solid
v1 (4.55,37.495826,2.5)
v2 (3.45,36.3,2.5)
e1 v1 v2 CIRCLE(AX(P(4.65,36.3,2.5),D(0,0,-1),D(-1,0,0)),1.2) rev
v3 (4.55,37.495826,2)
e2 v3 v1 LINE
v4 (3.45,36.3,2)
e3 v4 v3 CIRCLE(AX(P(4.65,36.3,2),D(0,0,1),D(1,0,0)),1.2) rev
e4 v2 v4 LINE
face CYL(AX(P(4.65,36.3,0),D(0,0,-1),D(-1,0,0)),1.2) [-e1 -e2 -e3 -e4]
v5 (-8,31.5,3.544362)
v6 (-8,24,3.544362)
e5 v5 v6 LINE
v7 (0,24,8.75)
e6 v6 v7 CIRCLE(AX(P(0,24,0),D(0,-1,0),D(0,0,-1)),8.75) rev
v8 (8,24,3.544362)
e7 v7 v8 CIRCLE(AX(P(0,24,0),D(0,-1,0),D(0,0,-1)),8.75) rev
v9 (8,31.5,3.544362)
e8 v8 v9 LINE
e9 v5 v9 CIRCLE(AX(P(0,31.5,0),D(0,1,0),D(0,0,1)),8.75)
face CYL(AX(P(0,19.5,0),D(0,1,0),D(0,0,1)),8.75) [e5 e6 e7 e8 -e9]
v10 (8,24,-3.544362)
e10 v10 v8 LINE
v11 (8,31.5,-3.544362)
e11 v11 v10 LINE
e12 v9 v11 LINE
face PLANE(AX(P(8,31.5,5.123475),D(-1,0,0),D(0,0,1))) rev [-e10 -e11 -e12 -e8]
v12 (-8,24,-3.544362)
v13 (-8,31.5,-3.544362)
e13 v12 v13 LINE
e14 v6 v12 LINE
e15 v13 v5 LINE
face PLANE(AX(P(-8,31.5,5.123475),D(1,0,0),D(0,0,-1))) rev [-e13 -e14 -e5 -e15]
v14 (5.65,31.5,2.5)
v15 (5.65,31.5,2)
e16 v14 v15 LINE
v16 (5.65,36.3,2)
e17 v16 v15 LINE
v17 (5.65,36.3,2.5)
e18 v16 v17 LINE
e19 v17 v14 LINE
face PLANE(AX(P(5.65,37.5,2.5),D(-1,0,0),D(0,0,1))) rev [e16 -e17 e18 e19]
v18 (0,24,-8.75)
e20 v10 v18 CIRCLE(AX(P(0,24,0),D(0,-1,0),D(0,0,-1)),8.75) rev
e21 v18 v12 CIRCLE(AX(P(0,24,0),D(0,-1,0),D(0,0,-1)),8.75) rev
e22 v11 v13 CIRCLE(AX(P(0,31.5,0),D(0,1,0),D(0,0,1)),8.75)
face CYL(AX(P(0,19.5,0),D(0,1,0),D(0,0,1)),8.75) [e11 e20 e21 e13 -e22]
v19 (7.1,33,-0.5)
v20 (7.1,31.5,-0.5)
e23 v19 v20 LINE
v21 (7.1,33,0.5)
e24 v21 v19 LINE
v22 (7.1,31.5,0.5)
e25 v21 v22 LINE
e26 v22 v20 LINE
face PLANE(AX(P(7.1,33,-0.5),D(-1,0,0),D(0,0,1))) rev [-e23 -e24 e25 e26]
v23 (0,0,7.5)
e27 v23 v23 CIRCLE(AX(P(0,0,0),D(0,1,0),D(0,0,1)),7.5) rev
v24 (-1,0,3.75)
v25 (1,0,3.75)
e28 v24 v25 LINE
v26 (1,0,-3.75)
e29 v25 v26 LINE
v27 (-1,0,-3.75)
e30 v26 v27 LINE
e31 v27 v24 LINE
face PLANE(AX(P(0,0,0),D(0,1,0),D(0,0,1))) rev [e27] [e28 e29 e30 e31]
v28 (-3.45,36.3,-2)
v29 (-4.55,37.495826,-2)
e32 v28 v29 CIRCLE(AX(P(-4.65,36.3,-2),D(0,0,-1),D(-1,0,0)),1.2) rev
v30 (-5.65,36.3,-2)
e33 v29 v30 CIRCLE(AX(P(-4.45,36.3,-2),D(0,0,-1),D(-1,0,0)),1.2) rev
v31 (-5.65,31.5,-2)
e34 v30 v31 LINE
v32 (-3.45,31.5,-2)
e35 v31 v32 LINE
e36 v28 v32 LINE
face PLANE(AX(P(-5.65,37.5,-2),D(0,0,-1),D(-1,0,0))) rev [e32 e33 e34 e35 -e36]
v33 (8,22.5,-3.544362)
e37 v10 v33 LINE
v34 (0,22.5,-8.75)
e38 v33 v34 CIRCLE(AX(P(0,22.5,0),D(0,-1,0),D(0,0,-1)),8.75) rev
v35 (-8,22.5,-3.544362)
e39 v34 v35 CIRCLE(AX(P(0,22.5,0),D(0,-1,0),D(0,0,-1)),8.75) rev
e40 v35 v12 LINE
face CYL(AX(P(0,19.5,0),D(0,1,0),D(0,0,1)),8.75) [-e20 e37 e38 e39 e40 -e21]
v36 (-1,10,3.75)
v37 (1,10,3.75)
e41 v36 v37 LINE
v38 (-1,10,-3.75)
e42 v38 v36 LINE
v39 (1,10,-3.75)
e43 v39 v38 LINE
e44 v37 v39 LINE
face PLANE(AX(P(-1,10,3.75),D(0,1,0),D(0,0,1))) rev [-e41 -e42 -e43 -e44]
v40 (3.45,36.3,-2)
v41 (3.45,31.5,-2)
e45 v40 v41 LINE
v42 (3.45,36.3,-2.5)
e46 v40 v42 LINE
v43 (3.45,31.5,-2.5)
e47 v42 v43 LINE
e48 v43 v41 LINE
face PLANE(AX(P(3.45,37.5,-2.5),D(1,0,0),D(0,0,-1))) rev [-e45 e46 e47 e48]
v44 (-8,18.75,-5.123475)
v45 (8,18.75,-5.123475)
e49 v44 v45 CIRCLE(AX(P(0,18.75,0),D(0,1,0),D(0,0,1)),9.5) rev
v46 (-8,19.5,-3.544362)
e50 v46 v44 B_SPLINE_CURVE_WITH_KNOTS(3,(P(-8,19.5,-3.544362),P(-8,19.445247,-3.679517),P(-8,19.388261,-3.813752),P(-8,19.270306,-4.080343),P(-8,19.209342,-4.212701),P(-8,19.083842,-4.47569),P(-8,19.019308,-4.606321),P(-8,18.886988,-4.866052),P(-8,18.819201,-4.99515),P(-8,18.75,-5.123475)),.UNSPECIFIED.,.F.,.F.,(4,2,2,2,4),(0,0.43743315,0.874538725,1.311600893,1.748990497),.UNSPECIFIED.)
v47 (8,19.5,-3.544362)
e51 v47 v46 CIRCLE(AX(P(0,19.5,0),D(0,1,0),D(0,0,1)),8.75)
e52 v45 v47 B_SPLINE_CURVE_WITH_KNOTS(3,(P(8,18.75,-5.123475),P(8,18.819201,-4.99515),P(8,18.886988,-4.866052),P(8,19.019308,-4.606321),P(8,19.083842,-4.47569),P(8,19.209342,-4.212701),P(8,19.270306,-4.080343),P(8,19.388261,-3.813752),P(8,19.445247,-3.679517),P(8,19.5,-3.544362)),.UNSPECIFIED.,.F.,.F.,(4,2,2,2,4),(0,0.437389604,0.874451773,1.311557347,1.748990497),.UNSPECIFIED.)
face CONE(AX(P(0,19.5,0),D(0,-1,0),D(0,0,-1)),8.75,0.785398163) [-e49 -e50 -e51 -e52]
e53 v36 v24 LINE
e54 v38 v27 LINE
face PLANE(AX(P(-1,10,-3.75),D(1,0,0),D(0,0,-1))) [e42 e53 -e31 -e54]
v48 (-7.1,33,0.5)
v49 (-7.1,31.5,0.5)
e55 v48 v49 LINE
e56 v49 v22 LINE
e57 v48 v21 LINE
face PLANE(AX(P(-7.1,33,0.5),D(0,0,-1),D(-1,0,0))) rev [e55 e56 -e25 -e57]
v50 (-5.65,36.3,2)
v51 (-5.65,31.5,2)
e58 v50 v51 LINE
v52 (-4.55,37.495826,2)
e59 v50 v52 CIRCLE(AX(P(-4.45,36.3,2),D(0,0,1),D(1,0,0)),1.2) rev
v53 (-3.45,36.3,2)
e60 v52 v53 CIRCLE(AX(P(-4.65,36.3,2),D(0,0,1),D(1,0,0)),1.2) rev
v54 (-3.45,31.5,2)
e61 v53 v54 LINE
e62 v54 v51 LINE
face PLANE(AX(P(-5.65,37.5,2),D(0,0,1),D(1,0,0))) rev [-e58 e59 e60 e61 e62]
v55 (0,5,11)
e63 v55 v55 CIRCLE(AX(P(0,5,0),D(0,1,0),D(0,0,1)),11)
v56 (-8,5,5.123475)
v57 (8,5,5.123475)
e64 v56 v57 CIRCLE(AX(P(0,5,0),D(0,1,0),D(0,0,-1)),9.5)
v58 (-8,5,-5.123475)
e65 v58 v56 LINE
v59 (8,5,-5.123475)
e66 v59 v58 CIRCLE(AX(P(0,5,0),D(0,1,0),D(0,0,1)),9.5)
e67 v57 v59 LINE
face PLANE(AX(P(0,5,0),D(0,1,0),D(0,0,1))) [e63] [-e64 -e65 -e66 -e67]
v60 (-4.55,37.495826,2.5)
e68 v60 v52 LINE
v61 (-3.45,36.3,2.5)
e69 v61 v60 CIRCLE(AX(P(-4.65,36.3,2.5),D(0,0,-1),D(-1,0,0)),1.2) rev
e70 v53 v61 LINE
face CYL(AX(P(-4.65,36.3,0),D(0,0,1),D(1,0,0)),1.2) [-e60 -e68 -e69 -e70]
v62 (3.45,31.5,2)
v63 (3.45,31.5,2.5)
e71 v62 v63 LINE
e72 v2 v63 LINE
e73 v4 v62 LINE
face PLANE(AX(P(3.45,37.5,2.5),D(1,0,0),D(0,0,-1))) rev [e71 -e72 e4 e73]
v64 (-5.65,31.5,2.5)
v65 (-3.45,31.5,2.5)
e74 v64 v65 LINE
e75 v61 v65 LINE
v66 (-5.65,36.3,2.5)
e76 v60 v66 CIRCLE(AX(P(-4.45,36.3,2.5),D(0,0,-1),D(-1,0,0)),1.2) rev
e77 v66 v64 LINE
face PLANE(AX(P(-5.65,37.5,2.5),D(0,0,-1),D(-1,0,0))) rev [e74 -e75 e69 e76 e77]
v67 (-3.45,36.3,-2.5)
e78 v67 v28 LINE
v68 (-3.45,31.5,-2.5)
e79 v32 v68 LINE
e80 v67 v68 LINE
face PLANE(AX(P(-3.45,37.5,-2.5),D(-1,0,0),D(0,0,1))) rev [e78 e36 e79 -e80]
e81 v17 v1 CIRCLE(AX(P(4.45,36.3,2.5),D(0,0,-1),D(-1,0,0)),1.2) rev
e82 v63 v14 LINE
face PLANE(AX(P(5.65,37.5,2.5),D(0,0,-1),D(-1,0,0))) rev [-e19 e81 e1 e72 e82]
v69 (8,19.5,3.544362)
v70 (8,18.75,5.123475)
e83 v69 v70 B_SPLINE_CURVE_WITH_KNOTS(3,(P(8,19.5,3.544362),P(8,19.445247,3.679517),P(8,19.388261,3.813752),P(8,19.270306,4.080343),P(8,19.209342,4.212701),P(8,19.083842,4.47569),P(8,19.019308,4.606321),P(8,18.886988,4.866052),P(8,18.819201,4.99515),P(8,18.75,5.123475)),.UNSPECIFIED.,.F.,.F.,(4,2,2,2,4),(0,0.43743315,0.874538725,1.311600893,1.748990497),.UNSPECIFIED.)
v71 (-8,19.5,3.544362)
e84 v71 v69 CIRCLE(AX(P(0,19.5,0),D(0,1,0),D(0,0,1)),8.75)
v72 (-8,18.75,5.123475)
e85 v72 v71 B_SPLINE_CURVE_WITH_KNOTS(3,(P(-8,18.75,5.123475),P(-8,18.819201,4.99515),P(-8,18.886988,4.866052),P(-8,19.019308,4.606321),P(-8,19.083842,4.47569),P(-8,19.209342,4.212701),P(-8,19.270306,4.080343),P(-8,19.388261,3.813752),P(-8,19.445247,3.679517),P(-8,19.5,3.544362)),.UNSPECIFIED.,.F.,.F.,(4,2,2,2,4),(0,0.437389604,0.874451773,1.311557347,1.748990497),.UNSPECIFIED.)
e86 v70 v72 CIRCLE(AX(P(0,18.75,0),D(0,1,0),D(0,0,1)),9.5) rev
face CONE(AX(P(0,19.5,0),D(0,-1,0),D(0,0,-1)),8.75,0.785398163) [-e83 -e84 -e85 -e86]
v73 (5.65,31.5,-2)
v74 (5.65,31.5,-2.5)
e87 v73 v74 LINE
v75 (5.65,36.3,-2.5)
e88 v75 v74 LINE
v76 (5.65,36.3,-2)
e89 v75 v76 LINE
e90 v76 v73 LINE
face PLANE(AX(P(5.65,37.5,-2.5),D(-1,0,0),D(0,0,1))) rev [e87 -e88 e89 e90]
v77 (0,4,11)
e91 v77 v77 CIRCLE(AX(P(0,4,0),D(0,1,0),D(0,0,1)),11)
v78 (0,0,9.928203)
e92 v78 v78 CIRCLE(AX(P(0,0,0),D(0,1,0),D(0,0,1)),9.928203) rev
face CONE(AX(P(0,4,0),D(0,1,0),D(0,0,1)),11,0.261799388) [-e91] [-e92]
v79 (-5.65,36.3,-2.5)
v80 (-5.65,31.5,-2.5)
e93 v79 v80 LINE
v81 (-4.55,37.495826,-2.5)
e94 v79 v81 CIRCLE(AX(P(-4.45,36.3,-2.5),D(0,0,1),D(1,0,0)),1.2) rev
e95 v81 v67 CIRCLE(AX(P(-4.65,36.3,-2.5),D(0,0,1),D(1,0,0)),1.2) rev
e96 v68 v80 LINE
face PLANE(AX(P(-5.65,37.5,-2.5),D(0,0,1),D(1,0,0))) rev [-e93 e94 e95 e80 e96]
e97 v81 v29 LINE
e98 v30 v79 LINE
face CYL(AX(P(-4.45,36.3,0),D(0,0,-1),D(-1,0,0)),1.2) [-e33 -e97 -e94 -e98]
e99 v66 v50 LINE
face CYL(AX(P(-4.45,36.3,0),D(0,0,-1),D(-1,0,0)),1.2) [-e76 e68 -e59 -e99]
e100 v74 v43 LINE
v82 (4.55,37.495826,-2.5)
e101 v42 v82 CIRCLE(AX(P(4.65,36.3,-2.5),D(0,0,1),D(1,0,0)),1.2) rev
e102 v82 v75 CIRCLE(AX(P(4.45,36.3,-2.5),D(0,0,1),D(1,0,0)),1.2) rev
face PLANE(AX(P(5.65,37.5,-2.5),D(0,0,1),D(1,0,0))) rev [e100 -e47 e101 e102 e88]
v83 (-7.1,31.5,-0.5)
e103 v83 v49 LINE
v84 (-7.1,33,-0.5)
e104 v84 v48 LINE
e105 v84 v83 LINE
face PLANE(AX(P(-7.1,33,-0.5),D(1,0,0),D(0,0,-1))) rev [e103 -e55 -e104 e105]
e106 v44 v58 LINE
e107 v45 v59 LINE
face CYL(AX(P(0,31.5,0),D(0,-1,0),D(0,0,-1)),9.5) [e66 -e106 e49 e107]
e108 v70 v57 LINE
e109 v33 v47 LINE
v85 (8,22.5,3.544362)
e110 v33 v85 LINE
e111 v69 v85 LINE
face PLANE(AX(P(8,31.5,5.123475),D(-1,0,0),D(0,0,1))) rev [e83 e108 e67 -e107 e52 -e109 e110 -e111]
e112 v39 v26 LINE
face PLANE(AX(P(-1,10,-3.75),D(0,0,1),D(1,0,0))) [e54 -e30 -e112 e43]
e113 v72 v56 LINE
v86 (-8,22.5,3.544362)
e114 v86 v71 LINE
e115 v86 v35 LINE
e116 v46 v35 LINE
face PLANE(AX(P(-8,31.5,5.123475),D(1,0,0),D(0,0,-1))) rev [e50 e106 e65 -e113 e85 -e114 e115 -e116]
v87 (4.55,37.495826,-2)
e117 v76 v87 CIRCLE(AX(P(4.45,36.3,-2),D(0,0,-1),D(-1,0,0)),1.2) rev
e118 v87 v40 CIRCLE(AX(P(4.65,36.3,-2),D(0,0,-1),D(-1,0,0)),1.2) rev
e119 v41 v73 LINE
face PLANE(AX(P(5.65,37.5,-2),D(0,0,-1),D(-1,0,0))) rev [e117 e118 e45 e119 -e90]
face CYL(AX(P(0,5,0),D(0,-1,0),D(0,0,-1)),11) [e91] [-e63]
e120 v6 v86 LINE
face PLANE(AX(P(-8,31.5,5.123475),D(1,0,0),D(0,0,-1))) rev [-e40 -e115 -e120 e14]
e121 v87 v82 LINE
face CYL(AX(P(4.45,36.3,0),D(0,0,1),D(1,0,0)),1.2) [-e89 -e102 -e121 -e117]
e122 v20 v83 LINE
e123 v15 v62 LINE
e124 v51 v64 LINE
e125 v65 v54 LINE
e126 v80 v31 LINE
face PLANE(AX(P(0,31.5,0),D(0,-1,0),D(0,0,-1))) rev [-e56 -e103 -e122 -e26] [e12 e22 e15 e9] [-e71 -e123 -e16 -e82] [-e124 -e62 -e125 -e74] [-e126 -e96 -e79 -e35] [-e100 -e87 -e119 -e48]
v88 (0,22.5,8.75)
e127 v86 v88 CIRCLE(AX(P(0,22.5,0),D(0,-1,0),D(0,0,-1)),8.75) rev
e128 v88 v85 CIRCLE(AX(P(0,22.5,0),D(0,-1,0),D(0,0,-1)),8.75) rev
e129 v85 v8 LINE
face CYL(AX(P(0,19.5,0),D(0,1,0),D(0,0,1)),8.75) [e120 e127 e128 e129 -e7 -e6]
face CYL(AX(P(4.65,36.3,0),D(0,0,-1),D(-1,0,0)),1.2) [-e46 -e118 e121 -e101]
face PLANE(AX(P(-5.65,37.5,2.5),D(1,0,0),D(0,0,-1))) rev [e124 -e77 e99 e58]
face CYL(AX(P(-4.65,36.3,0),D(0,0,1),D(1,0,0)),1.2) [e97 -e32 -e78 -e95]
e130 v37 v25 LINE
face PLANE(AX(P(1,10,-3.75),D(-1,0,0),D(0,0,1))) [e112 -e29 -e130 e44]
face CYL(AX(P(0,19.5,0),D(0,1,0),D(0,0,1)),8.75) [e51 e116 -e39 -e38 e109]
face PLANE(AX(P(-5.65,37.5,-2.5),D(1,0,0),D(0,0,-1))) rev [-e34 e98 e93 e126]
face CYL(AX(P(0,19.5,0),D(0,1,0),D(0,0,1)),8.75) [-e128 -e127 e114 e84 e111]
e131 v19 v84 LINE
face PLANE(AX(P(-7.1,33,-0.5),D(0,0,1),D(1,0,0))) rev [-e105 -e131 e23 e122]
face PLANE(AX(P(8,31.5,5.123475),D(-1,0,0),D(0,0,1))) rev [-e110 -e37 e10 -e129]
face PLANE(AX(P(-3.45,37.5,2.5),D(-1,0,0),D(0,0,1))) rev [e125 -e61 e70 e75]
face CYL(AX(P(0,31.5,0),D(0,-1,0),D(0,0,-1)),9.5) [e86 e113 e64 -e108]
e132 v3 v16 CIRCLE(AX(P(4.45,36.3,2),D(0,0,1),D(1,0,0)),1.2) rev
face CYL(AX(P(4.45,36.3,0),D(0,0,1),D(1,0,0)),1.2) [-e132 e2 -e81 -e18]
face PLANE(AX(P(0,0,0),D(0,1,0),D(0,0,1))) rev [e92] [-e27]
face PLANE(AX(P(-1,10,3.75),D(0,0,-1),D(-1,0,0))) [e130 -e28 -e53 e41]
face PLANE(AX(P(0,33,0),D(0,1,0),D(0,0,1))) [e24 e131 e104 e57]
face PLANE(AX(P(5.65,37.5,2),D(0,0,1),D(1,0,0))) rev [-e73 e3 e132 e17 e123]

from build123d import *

# Parameters (mm, degrees)
SKETCH_1_R          = 11
EXTRUDE_1_DEPTH     = 5
CHAMFER_1_SIZE      = 4
CHAMFER_1_SIZE2     = 1.07179677
EXTRUDE_3_DEPTH     = 26.5
SKETCH_4_W          = 2
SKETCH_4_H          = 7.5
CUT_EXTRUDE_1_DEPTH = 10
SKETCH_6_W          = 2.2
SKETCH_6_H          = 0.5
EXTRUDE_1_2_DEPTH   = 6
SKETCH_7_W          = 14.2
SKETCH_7_H          = 1
EXTRUDE_2_DEPTH     = 1.5
CUT_EXTRUDE_START   = -12
SKETCH_9_R          = 9.5
SKETCH_9_R_2        = 8.75
CUT_EXTRUDE_2_DEPTH = 12
CHAMFER_2_SIZE      = 0.75
FILLET_1_R          = 1.2


# Some blends are built 0.0001 mm under size
with BuildPart() as part:
    # 草图1 → Extrude 1 (new body)
    with BuildSketch(Plane(origin=(0, 0, 0), x_dir=(1, 0, 0), z_dir=(0, 1, 0))):
        with Locations(Location((0, 0, 0), (0, 0, 270))):
            Circle(SKETCH_1_R)
    extrude(amount=EXTRUDE_1_DEPTH)

    # 倒角1
    chamfer_1_edges = [part.edges().sort_by_distance(p)[0] for p in [
        (0, 0, -11),
    ]]
    chamfer_1_side = [part.faces().sort_by_distance(p)[0] for p in [
        (0, 2.5, -11),
    ]]
    chamfer(chamfer_1_edges, length=CHAMFER_1_SIZE, length2=CHAMFER_1_SIZE2, reference=chamfer_1_side[0])

    # 草图3 → 拉伸3 (add)
    with BuildSketch(Plane(origin=(0, 5, 0), x_dir=(-1, 0, 0), z_dir=(0, 1, 0))):
        with BuildLine():
            Line((-8, 5.123475383), (-8, -5.123475383))
            ThreePointArc((-8, -5.123475383), (0, -9.5), (8, -5.123475383))
            Line((8, -5.123475383), (8, 5.123475383))
            ThreePointArc((8, 5.123475383), (0, 9.5), (-8, 5.123475383))
        make_face()
    extrude(amount=EXTRUDE_3_DEPTH)

    # 草图4 → 切除-拉伸1 (cut)
    with BuildSketch(Plane(origin=(0, 0, 0), x_dir=(-1, 0, 0), z_dir=(0, 1, 0))):
        Rectangle(SKETCH_4_W, SKETCH_4_H)
    extrude(amount=CUT_EXTRUDE_1_DEPTH, mode=Mode.SUBTRACT)

    # 草图6 → Extrude 1 2 (add)
    with BuildSketch(Plane(origin=(0, 31.5, 0), x_dir=(1, 0, 0), z_dir=(0, 1, 0))):
        with Locations((4.55, 2.25)):
            Rectangle(SKETCH_6_W, SKETCH_6_H)
        with Locations((-4.55, 2.25)):
            Rectangle(SKETCH_6_W, SKETCH_6_H)
        with Locations((4.55, -2.25)):
            Rectangle(SKETCH_6_W, SKETCH_6_H)
        with Locations((-4.55, -2.25)):
            Rectangle(SKETCH_6_W, SKETCH_6_H)
    extrude(amount=EXTRUDE_1_2_DEPTH)

    # 草图7 → 凸台-拉伸2 (add)
    with BuildSketch(Plane(origin=(0, 31.5, 0), x_dir=(1, 0, 0), z_dir=(0, 1, 0))):
        Rectangle(SKETCH_7_W, SKETCH_7_H)
    extrude(amount=EXTRUDE_2_DEPTH)

    # 草图9 → 切除-拉伸2 (cut)
    with BuildSketch(Plane(origin=(0, 31.5, 0), x_dir=(1, 0, 0), z_dir=(0, 1, 0)).offset(CUT_EXTRUDE_START)):
        Circle(SKETCH_9_R)
        Circle(SKETCH_9_R_2, mode=Mode.SUBTRACT)
    extrude(amount=CUT_EXTRUDE_2_DEPTH, mode=Mode.SUBTRACT)

    # 倒角2
    chamfer_2_edges = [part.edges().sort_by_distance(p)[0] for p in [
        (0, 19.5, 9.5),
        (0, 19.5, -9.5),
    ]]
    chamfer(chamfer_2_edges, length=CHAMFER_2_SIZE - 0.0001)  # a hair under: the kernel refuses the full size

    # 圆角1
    # the kernel refuses this fillet: 1.2 mm, written as the material it takes off along each edge
    with BuildSketch(Plane(origin=(-3.45, 37.5, -5.5), x_dir=(0, -1, 0), z_dir=(0, 0, 1)), Plane(origin=(-5.65, 37.5, 1), x_dir=(0, -1, 0), z_dir=(0, 0, -1)), Plane(origin=(5.65, 37.5, -1), x_dir=(0, -1, 0), z_dir=(0, 0, 1)), Plane(origin=(3.45, 37.5, 5.5), x_dir=(0, -1, 0), z_dir=(0, 0, -1))) as fillet_1_piece_1:
        with BuildLine():
            CenterArc((FILLET_1_R, -FILLET_1_R), FILLET_1_R, 90, 90)
            Line((0, -FILLET_1_R), (0, 0))
            Line((0, 0), (FILLET_1_R, 0))
        make_face()
    extrude(amount=6.5, mode=Mode.SUBTRACT)
    with BuildSketch(Plane(origin=(3.45, 37.5, -5.5), x_dir=(0, -1, 0), z_dir=(0, 0, 1)), Plane(origin=(5.65, 37.5, 1), x_dir=(0, -1, 0), z_dir=(0, 0, -1)), Plane(origin=(-5.65, 37.5, -1), x_dir=(0, -1, 0), z_dir=(0, 0, 1)), Plane(origin=(-3.45, 37.5, 5.5), x_dir=(0, -1, 0), z_dir=(0, 0, -1))) as fillet_1_piece_2:
        with BuildLine():
            CenterArc((FILLET_1_R, FILLET_1_R), FILLET_1_R, 180, 90)
            Line((0, FILLET_1_R), (0, 0))
            Line((0, 0), (FILLET_1_R, 0))
        make_face()
    extrude(amount=6.5, mode=Mode.SUBTRACT)


solid = part.part
